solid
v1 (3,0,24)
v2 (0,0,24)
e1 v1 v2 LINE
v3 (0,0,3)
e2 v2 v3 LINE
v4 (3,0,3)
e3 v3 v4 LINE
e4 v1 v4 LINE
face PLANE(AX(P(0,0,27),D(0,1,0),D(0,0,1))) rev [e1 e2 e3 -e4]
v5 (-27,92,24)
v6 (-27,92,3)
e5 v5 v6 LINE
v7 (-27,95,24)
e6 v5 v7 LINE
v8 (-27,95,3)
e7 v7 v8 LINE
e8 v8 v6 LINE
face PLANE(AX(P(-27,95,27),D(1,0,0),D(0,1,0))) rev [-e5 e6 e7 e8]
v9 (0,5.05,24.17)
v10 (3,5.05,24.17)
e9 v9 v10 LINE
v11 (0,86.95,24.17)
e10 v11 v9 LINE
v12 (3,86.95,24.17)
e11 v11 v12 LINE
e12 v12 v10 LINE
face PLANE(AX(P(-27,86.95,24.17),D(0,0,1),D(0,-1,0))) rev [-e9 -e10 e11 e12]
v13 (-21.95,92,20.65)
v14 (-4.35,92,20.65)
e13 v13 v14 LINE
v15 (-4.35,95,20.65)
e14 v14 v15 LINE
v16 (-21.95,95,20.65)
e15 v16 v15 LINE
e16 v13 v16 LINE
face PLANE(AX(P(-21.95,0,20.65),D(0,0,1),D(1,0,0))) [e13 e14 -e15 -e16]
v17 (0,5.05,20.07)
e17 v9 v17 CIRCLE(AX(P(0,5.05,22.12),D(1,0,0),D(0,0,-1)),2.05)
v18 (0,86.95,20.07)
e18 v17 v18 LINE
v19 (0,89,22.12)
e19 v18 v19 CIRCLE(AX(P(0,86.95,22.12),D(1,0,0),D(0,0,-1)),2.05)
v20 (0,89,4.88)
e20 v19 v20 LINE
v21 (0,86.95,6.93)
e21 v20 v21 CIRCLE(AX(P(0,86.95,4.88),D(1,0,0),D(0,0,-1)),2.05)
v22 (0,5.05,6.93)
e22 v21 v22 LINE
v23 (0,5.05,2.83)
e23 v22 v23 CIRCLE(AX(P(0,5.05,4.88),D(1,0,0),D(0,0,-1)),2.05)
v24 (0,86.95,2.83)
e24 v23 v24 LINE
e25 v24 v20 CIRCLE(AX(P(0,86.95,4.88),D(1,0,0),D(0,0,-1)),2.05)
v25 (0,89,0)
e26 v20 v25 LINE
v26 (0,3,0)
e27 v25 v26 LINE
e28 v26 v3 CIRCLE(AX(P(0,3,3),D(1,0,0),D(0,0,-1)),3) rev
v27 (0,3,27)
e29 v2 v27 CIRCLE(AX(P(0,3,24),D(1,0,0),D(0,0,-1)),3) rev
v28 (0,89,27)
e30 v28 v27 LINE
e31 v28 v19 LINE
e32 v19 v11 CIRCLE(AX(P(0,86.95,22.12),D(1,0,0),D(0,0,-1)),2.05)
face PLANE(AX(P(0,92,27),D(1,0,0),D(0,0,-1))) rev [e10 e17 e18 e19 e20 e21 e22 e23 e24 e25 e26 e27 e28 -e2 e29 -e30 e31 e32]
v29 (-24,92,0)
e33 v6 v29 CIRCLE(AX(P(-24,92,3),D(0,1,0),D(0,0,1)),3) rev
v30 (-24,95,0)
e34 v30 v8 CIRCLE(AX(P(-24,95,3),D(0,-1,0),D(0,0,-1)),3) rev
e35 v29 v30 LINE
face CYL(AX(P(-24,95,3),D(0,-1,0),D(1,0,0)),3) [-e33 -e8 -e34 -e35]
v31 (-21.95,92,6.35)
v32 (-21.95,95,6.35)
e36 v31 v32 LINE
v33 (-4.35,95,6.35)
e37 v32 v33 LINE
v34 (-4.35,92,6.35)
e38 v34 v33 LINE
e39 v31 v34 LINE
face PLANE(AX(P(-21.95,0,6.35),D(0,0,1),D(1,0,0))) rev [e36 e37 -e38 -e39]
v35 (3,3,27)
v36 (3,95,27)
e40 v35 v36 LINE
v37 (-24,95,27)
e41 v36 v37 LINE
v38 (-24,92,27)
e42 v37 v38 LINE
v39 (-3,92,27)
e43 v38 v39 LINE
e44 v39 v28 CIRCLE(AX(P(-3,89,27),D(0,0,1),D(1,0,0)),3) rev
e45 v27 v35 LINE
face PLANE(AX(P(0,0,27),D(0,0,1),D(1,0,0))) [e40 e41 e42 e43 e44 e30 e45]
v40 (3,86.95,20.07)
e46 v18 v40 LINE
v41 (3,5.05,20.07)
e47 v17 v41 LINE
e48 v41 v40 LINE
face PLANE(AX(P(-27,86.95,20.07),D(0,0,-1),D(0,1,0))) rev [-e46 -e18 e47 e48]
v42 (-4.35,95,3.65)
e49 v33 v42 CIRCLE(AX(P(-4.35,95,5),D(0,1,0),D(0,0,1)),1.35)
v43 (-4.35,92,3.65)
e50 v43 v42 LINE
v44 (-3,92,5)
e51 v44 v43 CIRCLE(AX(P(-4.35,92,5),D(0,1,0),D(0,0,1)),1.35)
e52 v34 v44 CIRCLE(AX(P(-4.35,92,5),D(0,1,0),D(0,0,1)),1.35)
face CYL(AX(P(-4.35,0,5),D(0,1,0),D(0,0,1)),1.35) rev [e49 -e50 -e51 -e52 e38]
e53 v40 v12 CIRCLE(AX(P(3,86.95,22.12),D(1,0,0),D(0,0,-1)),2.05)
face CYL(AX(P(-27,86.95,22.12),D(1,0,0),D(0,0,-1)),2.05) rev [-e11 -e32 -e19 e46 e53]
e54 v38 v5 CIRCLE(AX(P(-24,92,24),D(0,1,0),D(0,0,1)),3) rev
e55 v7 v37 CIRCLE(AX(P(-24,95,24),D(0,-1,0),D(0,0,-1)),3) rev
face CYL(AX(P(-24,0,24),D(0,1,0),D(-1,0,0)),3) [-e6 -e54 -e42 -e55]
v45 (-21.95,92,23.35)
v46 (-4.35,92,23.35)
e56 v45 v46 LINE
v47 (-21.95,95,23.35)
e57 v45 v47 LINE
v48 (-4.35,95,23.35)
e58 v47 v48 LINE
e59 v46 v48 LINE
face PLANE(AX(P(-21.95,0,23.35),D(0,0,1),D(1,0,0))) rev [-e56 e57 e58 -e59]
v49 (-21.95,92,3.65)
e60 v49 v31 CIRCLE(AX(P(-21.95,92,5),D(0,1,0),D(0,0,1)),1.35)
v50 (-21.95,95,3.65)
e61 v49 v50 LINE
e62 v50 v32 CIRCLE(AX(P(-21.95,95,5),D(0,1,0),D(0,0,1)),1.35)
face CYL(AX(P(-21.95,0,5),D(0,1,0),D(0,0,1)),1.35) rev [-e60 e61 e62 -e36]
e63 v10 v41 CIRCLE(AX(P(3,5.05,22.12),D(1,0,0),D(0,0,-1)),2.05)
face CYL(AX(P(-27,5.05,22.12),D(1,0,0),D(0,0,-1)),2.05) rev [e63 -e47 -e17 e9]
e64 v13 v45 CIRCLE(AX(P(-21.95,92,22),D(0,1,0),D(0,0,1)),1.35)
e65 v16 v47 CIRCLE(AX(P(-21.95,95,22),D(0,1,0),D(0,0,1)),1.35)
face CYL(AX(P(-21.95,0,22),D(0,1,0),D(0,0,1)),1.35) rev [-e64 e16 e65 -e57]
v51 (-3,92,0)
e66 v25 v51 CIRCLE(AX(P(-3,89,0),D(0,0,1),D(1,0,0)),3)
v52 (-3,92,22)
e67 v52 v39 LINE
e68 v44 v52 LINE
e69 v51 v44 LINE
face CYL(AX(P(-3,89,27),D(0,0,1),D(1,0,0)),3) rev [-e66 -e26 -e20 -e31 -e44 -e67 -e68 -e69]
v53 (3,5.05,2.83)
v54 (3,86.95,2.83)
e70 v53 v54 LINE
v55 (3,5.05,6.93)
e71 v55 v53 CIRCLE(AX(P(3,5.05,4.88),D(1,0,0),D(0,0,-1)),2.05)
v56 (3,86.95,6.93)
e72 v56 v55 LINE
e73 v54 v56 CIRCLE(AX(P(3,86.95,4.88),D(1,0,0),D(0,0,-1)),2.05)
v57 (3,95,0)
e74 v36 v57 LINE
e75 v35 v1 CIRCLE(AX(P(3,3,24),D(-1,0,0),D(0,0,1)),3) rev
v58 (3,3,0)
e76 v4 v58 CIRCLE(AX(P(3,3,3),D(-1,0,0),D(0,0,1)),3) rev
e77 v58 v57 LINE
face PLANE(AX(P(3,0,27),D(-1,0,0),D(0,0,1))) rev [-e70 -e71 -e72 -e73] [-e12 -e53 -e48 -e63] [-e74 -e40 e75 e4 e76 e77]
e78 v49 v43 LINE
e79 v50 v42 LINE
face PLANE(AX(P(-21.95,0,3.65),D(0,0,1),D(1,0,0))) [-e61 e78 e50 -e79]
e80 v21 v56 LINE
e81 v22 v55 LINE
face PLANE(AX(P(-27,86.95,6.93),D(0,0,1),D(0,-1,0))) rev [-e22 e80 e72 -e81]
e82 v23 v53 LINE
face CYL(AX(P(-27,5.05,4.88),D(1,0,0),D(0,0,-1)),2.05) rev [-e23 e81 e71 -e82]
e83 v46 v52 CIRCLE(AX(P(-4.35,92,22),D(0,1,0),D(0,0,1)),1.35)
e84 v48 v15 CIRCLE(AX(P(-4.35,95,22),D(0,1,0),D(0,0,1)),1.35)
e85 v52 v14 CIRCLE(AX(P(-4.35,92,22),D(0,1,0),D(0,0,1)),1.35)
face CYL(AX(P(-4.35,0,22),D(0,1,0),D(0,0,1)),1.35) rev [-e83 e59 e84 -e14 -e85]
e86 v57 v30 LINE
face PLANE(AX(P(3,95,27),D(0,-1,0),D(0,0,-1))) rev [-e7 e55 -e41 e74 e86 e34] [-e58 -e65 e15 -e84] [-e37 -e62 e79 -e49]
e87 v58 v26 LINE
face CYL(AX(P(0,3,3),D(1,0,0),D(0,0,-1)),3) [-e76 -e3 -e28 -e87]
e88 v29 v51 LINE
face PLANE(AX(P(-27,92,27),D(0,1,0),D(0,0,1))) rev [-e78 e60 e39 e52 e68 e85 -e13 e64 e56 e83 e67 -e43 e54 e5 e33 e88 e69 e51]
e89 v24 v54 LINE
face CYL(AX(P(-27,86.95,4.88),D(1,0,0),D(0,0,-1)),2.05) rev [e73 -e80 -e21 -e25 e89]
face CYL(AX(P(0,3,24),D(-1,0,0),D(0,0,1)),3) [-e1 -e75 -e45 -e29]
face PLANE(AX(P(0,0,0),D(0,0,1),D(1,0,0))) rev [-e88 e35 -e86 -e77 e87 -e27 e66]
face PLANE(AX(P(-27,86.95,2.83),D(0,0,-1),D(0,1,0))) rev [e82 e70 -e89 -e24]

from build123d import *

# Parameters (mm, degrees)
BOSS_EXTRUDE1_DEPTH = 27
CUT_EXTRUDE1_DEPTH  = 104.218215447
CUT_EXTRUDE2_DEPTH  = 103.386522551
FILLET1_R           = 3
FILLET2_R           = 3


with BuildPart() as part:
    # Sketch1 → Boss-Extrude1 (new body)
    with BuildSketch(Plane.XY):
        Polygon((0, 0), (3, 0), (3, 95), (-27, 95), (-27, 92), (0, 92), align=None)
    extrude(amount=BOSS_EXTRUDE1_DEPTH)

    # Sketch6 → Cut-Extrude1 (cut, through all)
    with BuildSketch(Plane(origin=(3, 0, 0), x_dir=(0, 0, -1), z_dir=(1, 0, 0))):
        with BuildLine():
            Line((-20.07, 86.95), (-20.07, 5.05))
            ThreePointArc((-20.07, 5.05), (-22.12, 3), (-24.17, 5.05))
            Line((-24.17, 5.05), (-24.17, 86.95))
            ThreePointArc((-24.17, 86.95), (-22.12, 89), (-20.07, 86.95))
        make_face()
        with BuildLine():
            Line((-2.83, 86.95), (-2.83, 5.05))
            ThreePointArc((-2.83, 5.05), (-4.88, 3), (-6.93, 5.05))
            Line((-6.93, 5.05), (-6.93, 86.95))
            ThreePointArc((-6.93, 86.95), (-4.88, 89), (-2.83, 86.95))
        make_face()
    extrude(amount=-CUT_EXTRUDE1_DEPTH, mode=Mode.SUBTRACT)

    # Sketch7 → Cut-Extrude2 (cut, through all)
    with BuildSketch(Plane(origin=(0, 95, 0), x_dir=(1, 0, 0), z_dir=(0, 1, 0))):
        with BuildLine():
            Line((-21.95, -3.65), (-4.35, -3.65))
            ThreePointArc((-4.35, -3.65), (-3, -5), (-4.35, -6.35))
            Line((-4.35, -6.35), (-21.95, -6.35))
            ThreePointArc((-21.95, -6.35), (-23.3, -5), (-21.95, -3.65))
        make_face()
        with BuildLine():
            Line((-21.95, -20.65), (-4.35, -20.65))
            ThreePointArc((-4.35, -20.65), (-3, -22), (-4.35, -23.35))
            Line((-4.35, -23.35), (-21.95, -23.35))
            ThreePointArc((-21.95, -23.35), (-23.3, -22), (-21.95, -20.65))
        make_face()
    extrude(amount=-CUT_EXTRUDE2_DEPTH, mode=Mode.SUBTRACT)

    # Fillet1
    fillet1_edges = [part.edges().sort_by_distance(p)[0] for p in [
        (0, 92, 13.5),
    ]]
    fillet(fillet1_edges, radius=FILLET1_R - 0.0001)  # a hair under: the kernel refuses the full size

    # Fillet2
    fillet2_edges = [part.edges().sort_by_distance(p)[0] for p in [
        (-27, 93.5, 27),
        (-27, 93.5, 0),
        (1.5, 0, 0),
        (1.5, 0, 27),
    ]]
    fillet(fillet2_edges, radius=FILLET2_R)


solid = part.part
